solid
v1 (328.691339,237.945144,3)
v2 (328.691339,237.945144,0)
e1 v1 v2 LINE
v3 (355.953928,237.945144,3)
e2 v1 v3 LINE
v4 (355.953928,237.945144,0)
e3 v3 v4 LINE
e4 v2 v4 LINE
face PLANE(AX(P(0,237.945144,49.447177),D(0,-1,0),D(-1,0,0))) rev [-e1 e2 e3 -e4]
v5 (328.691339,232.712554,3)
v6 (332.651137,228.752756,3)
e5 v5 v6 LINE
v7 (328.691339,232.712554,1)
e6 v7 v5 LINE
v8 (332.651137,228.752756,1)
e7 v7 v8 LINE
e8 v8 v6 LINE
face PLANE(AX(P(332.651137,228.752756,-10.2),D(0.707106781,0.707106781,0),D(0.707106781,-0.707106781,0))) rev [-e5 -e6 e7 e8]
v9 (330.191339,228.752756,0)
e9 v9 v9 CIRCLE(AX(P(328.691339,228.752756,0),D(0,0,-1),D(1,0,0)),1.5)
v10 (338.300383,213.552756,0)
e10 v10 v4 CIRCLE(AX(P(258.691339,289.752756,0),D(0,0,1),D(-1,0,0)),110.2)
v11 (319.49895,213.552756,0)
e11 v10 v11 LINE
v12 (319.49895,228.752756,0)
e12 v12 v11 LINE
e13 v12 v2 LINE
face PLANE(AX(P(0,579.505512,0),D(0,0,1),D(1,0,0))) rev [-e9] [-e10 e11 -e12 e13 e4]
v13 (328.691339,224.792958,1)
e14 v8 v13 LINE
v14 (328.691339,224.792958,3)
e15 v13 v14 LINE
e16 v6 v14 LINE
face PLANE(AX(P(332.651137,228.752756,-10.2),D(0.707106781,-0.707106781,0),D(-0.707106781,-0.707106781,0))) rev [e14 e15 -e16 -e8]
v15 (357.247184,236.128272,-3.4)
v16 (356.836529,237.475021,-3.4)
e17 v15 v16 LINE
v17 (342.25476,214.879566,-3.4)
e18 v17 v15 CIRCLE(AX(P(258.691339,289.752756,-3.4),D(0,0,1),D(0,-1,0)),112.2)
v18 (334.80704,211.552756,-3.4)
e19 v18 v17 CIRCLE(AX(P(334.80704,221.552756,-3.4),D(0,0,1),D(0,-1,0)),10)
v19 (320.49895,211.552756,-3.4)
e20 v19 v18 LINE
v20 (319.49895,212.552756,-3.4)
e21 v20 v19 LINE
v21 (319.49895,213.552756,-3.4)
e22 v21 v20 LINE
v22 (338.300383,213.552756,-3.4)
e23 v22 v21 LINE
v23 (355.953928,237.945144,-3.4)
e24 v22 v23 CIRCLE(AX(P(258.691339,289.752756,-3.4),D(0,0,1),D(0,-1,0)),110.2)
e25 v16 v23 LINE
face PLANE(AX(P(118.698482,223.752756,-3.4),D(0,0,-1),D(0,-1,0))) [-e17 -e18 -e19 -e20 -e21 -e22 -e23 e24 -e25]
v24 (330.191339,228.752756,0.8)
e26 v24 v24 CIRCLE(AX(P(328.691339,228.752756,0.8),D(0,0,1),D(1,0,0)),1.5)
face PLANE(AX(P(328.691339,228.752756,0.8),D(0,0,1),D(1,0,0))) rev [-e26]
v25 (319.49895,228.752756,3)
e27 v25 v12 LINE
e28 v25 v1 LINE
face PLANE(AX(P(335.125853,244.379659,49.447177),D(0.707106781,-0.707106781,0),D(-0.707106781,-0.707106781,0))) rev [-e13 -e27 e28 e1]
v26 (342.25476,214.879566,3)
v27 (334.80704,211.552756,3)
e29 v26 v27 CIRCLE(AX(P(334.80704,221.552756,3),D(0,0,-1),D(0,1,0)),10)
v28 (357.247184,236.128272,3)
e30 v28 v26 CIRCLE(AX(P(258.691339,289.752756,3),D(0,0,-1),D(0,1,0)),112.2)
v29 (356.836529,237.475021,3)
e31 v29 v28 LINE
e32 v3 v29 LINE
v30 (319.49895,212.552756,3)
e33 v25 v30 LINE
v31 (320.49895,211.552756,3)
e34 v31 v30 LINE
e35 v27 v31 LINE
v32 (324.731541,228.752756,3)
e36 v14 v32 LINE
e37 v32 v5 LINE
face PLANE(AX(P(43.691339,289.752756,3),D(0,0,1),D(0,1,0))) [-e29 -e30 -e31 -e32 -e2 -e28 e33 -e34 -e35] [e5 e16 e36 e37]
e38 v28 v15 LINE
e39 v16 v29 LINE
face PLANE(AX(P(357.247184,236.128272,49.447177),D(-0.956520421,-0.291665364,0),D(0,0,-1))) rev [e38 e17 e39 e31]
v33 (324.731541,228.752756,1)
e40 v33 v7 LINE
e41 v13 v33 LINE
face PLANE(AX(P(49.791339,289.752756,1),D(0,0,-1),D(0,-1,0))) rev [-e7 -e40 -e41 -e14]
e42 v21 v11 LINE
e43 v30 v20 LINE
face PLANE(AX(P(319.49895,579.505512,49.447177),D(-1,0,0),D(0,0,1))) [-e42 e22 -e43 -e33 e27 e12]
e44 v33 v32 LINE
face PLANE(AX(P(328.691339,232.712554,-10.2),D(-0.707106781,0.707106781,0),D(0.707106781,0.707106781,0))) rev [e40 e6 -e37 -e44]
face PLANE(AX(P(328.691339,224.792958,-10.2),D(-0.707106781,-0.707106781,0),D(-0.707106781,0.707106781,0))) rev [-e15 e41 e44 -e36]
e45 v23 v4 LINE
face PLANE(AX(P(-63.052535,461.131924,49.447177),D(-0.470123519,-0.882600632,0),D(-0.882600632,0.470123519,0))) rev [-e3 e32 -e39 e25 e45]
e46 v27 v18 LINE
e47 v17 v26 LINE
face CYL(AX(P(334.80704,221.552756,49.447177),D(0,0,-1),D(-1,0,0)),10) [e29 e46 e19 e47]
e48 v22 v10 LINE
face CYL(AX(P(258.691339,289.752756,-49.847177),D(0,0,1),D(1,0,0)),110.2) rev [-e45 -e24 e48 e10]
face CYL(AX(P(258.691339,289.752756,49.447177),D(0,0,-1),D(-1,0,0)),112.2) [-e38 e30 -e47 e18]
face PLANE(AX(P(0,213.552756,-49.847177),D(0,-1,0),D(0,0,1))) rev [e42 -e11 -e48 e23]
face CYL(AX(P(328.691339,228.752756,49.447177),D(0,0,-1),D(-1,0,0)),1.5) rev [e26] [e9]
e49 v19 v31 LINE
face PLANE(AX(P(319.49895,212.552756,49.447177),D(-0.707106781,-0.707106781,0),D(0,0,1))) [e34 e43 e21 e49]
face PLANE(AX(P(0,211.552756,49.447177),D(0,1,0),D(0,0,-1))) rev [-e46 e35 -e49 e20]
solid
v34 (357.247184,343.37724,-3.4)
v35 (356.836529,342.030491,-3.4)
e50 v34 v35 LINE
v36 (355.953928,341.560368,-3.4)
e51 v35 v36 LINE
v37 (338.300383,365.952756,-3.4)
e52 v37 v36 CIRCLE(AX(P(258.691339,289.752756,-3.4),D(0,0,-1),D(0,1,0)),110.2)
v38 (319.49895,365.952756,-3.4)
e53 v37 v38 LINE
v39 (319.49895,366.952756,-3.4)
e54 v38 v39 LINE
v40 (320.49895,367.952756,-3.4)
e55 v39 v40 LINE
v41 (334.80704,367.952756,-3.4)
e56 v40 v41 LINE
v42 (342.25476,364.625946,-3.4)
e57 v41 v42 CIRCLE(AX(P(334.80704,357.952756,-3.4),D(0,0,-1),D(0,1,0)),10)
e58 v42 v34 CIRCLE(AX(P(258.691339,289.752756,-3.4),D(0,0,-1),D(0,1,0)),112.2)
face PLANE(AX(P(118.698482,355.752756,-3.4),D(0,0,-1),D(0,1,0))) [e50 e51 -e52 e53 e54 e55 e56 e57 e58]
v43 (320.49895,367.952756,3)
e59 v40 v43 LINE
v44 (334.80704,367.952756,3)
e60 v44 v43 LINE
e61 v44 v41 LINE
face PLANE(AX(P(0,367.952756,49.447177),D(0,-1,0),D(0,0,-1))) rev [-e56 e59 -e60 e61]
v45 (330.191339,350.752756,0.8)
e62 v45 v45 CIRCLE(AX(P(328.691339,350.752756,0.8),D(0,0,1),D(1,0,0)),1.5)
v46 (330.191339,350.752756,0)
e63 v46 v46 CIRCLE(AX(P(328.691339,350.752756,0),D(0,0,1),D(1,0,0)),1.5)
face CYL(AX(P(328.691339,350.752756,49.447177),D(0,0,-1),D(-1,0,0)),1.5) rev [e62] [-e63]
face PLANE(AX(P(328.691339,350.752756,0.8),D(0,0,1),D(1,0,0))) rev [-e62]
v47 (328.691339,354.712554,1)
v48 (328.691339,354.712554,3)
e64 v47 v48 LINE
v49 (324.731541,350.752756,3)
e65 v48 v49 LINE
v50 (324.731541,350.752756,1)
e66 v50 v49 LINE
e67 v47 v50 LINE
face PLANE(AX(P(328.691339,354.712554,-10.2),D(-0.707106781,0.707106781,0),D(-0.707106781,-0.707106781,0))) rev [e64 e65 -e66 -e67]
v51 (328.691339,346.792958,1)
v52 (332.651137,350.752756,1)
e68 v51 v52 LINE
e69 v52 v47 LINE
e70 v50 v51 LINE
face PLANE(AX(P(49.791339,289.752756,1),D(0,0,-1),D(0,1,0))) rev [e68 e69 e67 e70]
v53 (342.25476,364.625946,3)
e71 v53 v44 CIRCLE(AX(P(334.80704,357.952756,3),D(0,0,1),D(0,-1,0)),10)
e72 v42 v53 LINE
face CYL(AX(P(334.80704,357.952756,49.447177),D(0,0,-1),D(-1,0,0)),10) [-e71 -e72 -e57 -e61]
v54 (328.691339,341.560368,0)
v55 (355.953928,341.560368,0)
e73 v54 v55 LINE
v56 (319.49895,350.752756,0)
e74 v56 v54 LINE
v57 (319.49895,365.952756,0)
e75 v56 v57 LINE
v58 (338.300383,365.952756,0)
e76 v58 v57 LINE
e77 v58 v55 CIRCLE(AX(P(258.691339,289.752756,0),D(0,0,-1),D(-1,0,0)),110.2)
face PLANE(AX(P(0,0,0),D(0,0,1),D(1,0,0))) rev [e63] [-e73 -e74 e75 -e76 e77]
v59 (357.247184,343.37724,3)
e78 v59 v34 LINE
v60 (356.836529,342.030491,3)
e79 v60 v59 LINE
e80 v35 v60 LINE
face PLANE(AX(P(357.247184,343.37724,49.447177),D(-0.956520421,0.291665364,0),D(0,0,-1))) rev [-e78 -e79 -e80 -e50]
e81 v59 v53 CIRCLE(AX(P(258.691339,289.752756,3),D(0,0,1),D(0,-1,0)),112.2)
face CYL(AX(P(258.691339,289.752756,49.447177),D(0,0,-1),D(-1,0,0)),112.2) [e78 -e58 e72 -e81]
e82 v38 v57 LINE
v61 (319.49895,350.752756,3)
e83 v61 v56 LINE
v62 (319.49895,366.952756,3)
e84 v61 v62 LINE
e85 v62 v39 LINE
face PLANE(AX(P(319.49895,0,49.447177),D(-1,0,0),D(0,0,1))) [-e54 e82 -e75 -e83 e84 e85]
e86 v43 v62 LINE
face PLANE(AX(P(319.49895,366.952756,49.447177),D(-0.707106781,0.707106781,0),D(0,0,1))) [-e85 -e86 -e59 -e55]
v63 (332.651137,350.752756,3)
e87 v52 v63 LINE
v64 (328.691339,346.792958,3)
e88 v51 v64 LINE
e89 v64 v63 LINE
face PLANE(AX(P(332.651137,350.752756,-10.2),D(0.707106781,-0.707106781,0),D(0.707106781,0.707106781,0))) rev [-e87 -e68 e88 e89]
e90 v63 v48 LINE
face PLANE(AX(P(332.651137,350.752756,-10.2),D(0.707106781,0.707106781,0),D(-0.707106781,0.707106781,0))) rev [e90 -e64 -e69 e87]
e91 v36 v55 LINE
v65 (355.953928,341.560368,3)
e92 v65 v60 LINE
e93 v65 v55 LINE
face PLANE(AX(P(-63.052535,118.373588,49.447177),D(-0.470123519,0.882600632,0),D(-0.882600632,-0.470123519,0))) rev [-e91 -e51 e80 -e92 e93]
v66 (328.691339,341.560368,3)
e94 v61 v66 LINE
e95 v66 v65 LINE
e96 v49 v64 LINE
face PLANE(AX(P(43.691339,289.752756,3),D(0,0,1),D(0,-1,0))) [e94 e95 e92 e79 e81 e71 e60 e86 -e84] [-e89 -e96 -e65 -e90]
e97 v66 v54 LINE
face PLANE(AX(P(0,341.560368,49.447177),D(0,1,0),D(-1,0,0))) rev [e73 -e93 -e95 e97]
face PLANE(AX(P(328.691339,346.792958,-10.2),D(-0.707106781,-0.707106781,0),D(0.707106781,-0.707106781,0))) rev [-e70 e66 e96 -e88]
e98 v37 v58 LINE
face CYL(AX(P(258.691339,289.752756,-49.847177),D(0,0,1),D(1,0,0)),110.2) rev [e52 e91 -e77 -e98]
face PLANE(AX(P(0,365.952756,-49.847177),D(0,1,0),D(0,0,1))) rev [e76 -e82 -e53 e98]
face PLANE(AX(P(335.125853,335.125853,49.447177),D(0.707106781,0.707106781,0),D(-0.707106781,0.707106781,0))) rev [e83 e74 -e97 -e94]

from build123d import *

# Parameters (mm, degrees)
SKETCH1_R           = 1.5
BOSS_EXTRUDE1_DEPTH = 3
BOSS_EXTRUDE2_START = 3.4
BOSS_EXTRUDE2_DEPTH = 3.4
CUT_EXTRUDE1_START  = -2
CUT_EXTRUDE1_DEPTH  = 2
FILLET1_R           = 10
CHAMFER1_SIZE       = 1
BOSS_EXTRUDE3_START = -0.2
SKETCH4_R           = 1.5
BOSS_EXTRUDE3_DEPTH = 0.2


with BuildPart() as part:
    # Sketch1 → Boss-Extrude1 (new body)
    with BuildSketch(Plane.XY):
        with BuildLine():
            Line((328.691338583, 341.56036775), (355.953928282, 341.56036775))
            Line((355.953928282, 341.56036775), (357.719129547, 342.500614789))
            ThreePointArc((357.719129547, 342.500614789), (349.332397931, 355.881708416), (339.150023633, 367.952755906))
            Line((339.150023633, 367.952755906), (319.498950427, 367.952755906))
            Line((319.498950427, 367.952755906), (319.498950427, 350.752755906))
            Line((319.498950427, 350.752755906), (328.691338583, 341.56036775))
        make_face()
        with Locations(Location((328.691338583, 350.752755906, 0), (0, 0, 270))):
            Circle(SKETCH1_R, mode=Mode.SUBTRACT)
    extrude(amount=BOSS_EXTRUDE1_DEPTH)

    # Sketch2 → Boss-Extrude2 (add)
    with BuildSketch(Plane(origin=(0, 0, 0), x_dir=(-1, 0, 0), z_dir=(0, 0, -1)).offset(BOSS_EXTRUDE2_START)):
        with BuildLine():
            Line((-319.498950427, 367.952755906), (-339.150023633, 367.952755906))
            ThreePointArc((-339.150023633, 367.952755906), (-349.332397931, 355.881708416), (-357.719129547, 342.500614789))
            Line((-357.719129547, 342.500614789), (-355.953928282, 341.56036775))
            ThreePointArc((-355.953928282, 341.56036775), (-347.964183921, 354.362345636), (-338.300383295, 365.952755906))
            Line((-338.300383295, 365.952755906), (-319.498950427, 365.952755906))
            Line((-319.498950427, 365.952755906), (-319.498950427, 367.952755906))
        make_face()
    extrude(amount=-BOSS_EXTRUDE2_DEPTH)

    # Sketch3 → Cut-Extrude1 (cut)
    with BuildSketch(Plane.XY.offset(3).offset(CUT_EXTRUDE1_START)):
        Polygon((332.651136557, 350.752755906), (328.691338583, 346.792957931), (324.731540608, 350.752755906), (328.691338583, 354.71255388), align=None)
    extrude(amount=CUT_EXTRUDE1_DEPTH, mode=Mode.SUBTRACT)

    # Fillet1
    fillet1_edges = [part.edges().sort_by_distance(p)[0] for p in [
        (339.150023633, 367.952755906, -0.2),
    ]]
    fillet(fillet1_edges, radius=FILLET1_R)

    # Chamfer1
    # the kernel refuses this chamfer: 1 mm, written as the material it takes off along each edge
    with BuildSketch(Plane(origin=(319.498950427, 367.952755906, 5.571682988), x_dir=(1, 0, 0), z_dir=(0, 0, -1))) as chamfer1_piece_1:
        Polygon((CHAMFER1_SIZE, 0), (0, CHAMFER1_SIZE), (0, 0), align=None)
    extrude(amount=11.543365976, mode=Mode.SUBTRACT)
    with BuildSketch(Plane(origin=(357.719129547, 342.500614789, -5.971682988), x_dir=(-0.4740347155917083, 0.8805061546712143, 7.820465649921131e-15), z_dir=(0, 0, 1))) as chamfer1_piece_2:
        with BuildLine():
            Line((0.995592665, 0), (CHAMFER1_SIZE * 0.00443668745667, CHAMFER1_SIZE * 0.999990157854))
            Line((CHAMFER1_SIZE * 0.00443668745667, CHAMFER1_SIZE * 0.999990157854), (0, 0))
            ThreePointArc((0, 0), (0.511873941, -0.001103406), (0.995592665, 0))
        make_face()
    extrude(amount=11.543365976, mode=Mode.SUBTRACT)


with BuildPart() as body_2:
    # Mirror2: mirrored copy
    add(part.part.mirror(Plane.ZX.offset(289.752755906)))


with BuildPart() as part_1:
    add(part.part)

    add(body_2.part)  # Boss-Extrude3 merges body 2
    # Sketch4 → Boss-Extrude3 (add)
    with BuildSketch(Plane.XY.offset(1).offset(BOSS_EXTRUDE3_START)):
        with Locations((328.691338583, 350.752755906)):
            Circle(SKETCH4_R)
        with Locations((328.691338583, 228.752755906)):
            Circle(SKETCH4_R)
    extrude(amount=BOSS_EXTRUDE3_DEPTH)


solid = part_1.part
